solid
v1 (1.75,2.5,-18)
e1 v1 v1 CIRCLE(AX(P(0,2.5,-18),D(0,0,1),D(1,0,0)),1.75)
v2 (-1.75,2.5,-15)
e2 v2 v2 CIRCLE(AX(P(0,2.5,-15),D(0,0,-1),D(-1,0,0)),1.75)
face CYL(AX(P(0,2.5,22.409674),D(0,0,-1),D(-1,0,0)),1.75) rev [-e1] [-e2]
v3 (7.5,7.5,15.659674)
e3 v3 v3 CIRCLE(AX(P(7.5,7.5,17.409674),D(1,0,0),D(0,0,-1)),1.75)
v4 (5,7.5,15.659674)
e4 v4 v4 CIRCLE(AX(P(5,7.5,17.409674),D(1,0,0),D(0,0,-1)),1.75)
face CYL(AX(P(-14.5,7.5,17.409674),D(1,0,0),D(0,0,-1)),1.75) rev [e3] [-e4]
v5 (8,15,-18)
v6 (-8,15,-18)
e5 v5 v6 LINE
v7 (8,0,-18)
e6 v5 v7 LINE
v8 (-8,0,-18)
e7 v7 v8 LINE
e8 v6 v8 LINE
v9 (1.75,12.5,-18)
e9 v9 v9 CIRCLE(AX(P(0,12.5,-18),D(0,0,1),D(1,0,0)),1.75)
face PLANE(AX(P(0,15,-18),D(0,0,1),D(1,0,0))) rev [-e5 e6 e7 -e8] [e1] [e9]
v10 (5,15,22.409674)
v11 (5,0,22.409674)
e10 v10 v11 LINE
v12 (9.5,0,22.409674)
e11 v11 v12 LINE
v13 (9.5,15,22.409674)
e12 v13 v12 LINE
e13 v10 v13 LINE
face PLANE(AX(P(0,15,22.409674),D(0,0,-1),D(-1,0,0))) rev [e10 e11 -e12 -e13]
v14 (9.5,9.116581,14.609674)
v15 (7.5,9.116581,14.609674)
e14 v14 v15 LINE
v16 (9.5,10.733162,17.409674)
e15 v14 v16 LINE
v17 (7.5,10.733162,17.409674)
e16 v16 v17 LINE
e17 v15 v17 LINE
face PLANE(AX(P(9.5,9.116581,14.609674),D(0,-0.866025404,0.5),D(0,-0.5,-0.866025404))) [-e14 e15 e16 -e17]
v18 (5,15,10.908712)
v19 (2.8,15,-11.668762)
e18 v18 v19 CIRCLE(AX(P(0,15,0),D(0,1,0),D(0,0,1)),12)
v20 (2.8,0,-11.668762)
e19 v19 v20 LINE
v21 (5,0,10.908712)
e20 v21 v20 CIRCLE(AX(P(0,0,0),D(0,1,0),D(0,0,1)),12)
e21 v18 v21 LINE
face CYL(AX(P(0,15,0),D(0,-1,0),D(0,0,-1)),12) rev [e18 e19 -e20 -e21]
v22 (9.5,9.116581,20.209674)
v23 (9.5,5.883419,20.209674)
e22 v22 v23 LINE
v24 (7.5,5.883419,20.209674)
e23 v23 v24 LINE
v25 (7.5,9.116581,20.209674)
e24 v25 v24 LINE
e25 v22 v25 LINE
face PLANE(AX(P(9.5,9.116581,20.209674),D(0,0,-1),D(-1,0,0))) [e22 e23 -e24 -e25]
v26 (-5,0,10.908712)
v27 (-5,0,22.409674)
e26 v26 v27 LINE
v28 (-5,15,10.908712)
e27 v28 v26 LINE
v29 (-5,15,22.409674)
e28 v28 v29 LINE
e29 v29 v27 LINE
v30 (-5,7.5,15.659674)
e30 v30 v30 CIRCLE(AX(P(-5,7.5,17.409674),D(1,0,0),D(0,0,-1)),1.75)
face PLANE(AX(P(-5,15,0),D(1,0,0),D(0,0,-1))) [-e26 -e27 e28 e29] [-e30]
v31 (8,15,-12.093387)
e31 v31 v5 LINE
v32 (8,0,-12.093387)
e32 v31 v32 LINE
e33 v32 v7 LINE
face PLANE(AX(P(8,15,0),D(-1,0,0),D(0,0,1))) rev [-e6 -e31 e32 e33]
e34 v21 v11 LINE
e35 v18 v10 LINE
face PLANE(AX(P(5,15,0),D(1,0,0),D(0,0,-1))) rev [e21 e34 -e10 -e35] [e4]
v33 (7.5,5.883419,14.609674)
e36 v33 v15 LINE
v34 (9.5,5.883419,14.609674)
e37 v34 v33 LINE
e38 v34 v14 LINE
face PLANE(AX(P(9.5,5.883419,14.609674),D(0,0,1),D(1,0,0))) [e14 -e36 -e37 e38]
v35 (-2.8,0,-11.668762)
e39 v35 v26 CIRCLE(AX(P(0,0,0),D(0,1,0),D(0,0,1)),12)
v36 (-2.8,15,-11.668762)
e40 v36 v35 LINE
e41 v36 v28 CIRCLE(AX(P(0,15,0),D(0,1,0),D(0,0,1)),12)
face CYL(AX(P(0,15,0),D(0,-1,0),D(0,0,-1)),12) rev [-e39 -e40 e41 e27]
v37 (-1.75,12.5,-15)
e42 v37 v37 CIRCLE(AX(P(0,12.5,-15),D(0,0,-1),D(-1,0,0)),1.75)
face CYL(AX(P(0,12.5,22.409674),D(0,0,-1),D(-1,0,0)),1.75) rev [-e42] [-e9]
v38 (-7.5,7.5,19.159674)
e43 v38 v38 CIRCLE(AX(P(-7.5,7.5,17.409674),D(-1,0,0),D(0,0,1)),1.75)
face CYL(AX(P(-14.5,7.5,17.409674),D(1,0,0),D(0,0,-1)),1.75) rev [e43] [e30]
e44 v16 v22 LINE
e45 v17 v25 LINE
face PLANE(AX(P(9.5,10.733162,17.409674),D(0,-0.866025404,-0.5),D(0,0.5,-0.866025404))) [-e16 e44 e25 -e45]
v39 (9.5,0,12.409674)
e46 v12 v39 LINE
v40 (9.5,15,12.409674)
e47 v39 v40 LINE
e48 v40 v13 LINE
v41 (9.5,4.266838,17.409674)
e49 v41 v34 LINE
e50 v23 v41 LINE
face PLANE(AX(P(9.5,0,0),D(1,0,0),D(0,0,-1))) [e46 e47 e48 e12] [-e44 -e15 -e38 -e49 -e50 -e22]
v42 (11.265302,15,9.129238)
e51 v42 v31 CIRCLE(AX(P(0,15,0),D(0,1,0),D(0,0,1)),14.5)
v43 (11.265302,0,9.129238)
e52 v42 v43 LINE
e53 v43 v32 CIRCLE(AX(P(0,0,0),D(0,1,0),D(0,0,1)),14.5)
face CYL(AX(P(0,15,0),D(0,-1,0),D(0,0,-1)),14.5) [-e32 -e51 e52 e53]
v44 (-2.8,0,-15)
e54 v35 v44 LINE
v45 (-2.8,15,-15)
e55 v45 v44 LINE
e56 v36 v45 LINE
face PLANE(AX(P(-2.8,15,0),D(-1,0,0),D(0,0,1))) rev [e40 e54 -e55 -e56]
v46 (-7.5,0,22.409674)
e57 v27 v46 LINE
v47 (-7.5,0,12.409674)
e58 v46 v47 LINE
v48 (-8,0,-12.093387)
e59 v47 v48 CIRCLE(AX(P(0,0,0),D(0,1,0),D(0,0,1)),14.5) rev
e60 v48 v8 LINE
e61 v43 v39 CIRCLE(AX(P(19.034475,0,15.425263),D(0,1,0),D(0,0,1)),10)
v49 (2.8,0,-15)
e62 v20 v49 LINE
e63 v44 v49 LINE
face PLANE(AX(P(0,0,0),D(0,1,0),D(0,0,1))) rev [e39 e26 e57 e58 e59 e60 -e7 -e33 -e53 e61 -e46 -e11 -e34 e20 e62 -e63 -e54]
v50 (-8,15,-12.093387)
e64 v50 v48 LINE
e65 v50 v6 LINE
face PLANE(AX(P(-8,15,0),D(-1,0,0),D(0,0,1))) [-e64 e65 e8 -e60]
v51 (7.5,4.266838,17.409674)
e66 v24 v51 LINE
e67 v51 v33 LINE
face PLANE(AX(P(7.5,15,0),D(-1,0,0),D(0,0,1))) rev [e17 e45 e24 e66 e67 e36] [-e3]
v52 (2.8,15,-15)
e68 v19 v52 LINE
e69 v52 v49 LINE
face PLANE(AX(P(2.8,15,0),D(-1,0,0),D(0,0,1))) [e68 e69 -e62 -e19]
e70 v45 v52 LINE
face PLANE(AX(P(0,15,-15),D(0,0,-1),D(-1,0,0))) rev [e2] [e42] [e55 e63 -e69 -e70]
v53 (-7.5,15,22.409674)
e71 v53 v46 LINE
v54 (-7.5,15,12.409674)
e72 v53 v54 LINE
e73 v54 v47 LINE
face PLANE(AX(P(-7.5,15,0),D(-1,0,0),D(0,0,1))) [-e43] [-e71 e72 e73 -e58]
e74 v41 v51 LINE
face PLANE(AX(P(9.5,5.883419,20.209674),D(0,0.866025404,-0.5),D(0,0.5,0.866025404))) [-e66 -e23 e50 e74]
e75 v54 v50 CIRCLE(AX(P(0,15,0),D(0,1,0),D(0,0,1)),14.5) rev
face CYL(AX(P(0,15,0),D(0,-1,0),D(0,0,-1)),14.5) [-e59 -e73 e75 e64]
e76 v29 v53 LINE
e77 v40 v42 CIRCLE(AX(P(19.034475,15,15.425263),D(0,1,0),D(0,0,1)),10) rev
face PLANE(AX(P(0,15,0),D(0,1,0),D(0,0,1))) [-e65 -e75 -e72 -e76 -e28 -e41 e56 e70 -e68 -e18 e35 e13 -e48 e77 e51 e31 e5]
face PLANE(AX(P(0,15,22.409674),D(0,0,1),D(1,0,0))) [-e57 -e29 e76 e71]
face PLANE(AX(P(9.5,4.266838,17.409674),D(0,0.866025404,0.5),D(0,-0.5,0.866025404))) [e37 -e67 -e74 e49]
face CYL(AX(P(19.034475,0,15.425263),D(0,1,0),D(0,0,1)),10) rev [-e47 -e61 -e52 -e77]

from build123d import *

# Parameters (mm, degrees)
RESSALTO_EXTRUS_O6_DEPTH   = 15
CORTE_EXTRUS_O1_DEPTH      = 46.47737596
CORTE_EXTRUS_O1_DEPTH_BACK = 46.47737596
ESBO_O14_R                 = 1.75
ESBO_O15_R                 = 1.75
CORTE_EXTRUS_O2_DEPTH      = 35.802205001
ESBO_O17_W                 = 10
ESBO_O17_H                 = 15
RESSALTO_EXTRUS_O7_DEPTH   = 2
FILETE1_R                  = 10


with BuildPart() as part:
    # Esboço13 → Ressalto-extrusão6 (new body)
    with BuildSketch(Plane(origin=(0, 0, 0), x_dir=(1, 0, 0), z_dir=(0, 1, 0))):
        with BuildLine():
            Line((-2.8, 15), (0, 15))
            Line((0, 15), (0, 15.348469228))
            Line((0, 15.348469228), (0, 16.348469228))
            Line((0, 16.348469228), (0, 18))
            Line((0, 18), (-8, 18))
            Line((-8, 18), (-8, 12.093386622))
            ThreePointArc((-8, 12.093386622), (-14.496982121, -0.295819827), (-7.5, -12.409673646))
            Line((-7.5, -12.409673646), (-7.5, -22.409673646))
            Line((-7.5, -22.409673646), (-5, -22.409673646))
            Line((-5, -22.409673646), (-5, -10.908712115))
            ThreePointArc((-5, -10.908712115), (-11.943432553, 1.16379502), (-2.8, 11.668761717))
            Line((-2.8, 11.668761717), (-2.8, 15))
        make_face()
        with BuildLine():
            ThreePointArc((2.8, 11.668761717), (11.943432553, 1.16379502), (5, -10.908712115))
            Line((5, -10.908712115), (5, -22.409673646))
            Line((5, -22.409673646), (7.5, -22.409673646))
            Line((7.5, -22.409673646), (7.5, -12.409673646))
            ThreePointArc((7.5, -12.409673646), (14.496982121, -0.295819827), (8, 12.093386622))
            Line((8, 12.093386622), (8, 18))
            Line((8, 18), (0, 18))
            Line((0, 18), (0, 16.348469228))
            Line((0, 16.348469228), (0, 15.348469228))
            Line((0, 15.348469228), (0, 15))
            Line((0, 15), (2.8, 15))
            Line((2.8, 15), (2.8, 11.668761717))
        make_face()
    extrude(amount=RESSALTO_EXTRUS_O6_DEPTH)

    # Esboço14 → Corte-extrusão1 (cut, two sides: drawn at the far end of the back side and taken through both)
    with BuildSketch(Plane(origin=(0, 0, -18), x_dir=(-1, 0, 0), z_dir=(0, 0, -1)).offset(-CORTE_EXTRUS_O1_DEPTH_BACK)):
        with Locations((0, 12.5)):
            Circle(ESBO_O14_R)
        with Locations((0, 2.5)):
            Circle(ESBO_O14_R)
    extrude(amount=CORTE_EXTRUS_O1_DEPTH + CORTE_EXTRUS_O1_DEPTH_BACK, mode=Mode.SUBTRACT)

    # Esboço15 → Corte-extrusão2 (cut, through all)
    with BuildSketch(Plane(origin=(7.5, 0, 0), x_dir=(0, 0, -1), z_dir=(1, 0, 0))):
        with Locations((-17.409673646, 7.5)):
            Circle(ESBO_O15_R)
    extrude(amount=-CORTE_EXTRUS_O2_DEPTH, mode=Mode.SUBTRACT)

    # Esboço17 → Ressalto-extrusão7 (add)
    with BuildSketch(Plane(origin=(7.5, 0, 0), x_dir=(0, 0, -1), z_dir=(1, 0, 0))):
        with Locations((-17.409673646, 7.5)):
            Rectangle(ESBO_O17_W, ESBO_O17_H)
        Polygon((-17.409673646, 10.733161507), (-20.209673646, 9.116580754), (-20.209673646, 5.883419246), (-17.409673646, 4.266838493), (-14.609673646, 5.883419246), (-14.609673646, 9.116580754), align=None, mode=Mode.SUBTRACT)
    extrude(amount=RESSALTO_EXTRUS_O7_DEPTH)

    # Filete1
    # the kernel refuses this fillet: 10 mm, written as the material it adds along each edge
    with BuildSketch(Plane(origin=(7.5, 0, 12.409673646), x_dir=(0.7539844158894258, 0, -0.656892305173292), z_dir=(0, 1, 0))) as filete1_piece_1:
        with BuildLine():
            CenterArc((6.715896851, -9.850615741), FILETE1_R, 99.91590085, 21.469545267)
            Line((1.507968832, -1.31378461), (0, 0))
            ThreePointArc((0, 0), (2.496936009, -0.216607176), (4.993872017, 0))
        make_face()
    extrude(amount=15)


solid = part.part
